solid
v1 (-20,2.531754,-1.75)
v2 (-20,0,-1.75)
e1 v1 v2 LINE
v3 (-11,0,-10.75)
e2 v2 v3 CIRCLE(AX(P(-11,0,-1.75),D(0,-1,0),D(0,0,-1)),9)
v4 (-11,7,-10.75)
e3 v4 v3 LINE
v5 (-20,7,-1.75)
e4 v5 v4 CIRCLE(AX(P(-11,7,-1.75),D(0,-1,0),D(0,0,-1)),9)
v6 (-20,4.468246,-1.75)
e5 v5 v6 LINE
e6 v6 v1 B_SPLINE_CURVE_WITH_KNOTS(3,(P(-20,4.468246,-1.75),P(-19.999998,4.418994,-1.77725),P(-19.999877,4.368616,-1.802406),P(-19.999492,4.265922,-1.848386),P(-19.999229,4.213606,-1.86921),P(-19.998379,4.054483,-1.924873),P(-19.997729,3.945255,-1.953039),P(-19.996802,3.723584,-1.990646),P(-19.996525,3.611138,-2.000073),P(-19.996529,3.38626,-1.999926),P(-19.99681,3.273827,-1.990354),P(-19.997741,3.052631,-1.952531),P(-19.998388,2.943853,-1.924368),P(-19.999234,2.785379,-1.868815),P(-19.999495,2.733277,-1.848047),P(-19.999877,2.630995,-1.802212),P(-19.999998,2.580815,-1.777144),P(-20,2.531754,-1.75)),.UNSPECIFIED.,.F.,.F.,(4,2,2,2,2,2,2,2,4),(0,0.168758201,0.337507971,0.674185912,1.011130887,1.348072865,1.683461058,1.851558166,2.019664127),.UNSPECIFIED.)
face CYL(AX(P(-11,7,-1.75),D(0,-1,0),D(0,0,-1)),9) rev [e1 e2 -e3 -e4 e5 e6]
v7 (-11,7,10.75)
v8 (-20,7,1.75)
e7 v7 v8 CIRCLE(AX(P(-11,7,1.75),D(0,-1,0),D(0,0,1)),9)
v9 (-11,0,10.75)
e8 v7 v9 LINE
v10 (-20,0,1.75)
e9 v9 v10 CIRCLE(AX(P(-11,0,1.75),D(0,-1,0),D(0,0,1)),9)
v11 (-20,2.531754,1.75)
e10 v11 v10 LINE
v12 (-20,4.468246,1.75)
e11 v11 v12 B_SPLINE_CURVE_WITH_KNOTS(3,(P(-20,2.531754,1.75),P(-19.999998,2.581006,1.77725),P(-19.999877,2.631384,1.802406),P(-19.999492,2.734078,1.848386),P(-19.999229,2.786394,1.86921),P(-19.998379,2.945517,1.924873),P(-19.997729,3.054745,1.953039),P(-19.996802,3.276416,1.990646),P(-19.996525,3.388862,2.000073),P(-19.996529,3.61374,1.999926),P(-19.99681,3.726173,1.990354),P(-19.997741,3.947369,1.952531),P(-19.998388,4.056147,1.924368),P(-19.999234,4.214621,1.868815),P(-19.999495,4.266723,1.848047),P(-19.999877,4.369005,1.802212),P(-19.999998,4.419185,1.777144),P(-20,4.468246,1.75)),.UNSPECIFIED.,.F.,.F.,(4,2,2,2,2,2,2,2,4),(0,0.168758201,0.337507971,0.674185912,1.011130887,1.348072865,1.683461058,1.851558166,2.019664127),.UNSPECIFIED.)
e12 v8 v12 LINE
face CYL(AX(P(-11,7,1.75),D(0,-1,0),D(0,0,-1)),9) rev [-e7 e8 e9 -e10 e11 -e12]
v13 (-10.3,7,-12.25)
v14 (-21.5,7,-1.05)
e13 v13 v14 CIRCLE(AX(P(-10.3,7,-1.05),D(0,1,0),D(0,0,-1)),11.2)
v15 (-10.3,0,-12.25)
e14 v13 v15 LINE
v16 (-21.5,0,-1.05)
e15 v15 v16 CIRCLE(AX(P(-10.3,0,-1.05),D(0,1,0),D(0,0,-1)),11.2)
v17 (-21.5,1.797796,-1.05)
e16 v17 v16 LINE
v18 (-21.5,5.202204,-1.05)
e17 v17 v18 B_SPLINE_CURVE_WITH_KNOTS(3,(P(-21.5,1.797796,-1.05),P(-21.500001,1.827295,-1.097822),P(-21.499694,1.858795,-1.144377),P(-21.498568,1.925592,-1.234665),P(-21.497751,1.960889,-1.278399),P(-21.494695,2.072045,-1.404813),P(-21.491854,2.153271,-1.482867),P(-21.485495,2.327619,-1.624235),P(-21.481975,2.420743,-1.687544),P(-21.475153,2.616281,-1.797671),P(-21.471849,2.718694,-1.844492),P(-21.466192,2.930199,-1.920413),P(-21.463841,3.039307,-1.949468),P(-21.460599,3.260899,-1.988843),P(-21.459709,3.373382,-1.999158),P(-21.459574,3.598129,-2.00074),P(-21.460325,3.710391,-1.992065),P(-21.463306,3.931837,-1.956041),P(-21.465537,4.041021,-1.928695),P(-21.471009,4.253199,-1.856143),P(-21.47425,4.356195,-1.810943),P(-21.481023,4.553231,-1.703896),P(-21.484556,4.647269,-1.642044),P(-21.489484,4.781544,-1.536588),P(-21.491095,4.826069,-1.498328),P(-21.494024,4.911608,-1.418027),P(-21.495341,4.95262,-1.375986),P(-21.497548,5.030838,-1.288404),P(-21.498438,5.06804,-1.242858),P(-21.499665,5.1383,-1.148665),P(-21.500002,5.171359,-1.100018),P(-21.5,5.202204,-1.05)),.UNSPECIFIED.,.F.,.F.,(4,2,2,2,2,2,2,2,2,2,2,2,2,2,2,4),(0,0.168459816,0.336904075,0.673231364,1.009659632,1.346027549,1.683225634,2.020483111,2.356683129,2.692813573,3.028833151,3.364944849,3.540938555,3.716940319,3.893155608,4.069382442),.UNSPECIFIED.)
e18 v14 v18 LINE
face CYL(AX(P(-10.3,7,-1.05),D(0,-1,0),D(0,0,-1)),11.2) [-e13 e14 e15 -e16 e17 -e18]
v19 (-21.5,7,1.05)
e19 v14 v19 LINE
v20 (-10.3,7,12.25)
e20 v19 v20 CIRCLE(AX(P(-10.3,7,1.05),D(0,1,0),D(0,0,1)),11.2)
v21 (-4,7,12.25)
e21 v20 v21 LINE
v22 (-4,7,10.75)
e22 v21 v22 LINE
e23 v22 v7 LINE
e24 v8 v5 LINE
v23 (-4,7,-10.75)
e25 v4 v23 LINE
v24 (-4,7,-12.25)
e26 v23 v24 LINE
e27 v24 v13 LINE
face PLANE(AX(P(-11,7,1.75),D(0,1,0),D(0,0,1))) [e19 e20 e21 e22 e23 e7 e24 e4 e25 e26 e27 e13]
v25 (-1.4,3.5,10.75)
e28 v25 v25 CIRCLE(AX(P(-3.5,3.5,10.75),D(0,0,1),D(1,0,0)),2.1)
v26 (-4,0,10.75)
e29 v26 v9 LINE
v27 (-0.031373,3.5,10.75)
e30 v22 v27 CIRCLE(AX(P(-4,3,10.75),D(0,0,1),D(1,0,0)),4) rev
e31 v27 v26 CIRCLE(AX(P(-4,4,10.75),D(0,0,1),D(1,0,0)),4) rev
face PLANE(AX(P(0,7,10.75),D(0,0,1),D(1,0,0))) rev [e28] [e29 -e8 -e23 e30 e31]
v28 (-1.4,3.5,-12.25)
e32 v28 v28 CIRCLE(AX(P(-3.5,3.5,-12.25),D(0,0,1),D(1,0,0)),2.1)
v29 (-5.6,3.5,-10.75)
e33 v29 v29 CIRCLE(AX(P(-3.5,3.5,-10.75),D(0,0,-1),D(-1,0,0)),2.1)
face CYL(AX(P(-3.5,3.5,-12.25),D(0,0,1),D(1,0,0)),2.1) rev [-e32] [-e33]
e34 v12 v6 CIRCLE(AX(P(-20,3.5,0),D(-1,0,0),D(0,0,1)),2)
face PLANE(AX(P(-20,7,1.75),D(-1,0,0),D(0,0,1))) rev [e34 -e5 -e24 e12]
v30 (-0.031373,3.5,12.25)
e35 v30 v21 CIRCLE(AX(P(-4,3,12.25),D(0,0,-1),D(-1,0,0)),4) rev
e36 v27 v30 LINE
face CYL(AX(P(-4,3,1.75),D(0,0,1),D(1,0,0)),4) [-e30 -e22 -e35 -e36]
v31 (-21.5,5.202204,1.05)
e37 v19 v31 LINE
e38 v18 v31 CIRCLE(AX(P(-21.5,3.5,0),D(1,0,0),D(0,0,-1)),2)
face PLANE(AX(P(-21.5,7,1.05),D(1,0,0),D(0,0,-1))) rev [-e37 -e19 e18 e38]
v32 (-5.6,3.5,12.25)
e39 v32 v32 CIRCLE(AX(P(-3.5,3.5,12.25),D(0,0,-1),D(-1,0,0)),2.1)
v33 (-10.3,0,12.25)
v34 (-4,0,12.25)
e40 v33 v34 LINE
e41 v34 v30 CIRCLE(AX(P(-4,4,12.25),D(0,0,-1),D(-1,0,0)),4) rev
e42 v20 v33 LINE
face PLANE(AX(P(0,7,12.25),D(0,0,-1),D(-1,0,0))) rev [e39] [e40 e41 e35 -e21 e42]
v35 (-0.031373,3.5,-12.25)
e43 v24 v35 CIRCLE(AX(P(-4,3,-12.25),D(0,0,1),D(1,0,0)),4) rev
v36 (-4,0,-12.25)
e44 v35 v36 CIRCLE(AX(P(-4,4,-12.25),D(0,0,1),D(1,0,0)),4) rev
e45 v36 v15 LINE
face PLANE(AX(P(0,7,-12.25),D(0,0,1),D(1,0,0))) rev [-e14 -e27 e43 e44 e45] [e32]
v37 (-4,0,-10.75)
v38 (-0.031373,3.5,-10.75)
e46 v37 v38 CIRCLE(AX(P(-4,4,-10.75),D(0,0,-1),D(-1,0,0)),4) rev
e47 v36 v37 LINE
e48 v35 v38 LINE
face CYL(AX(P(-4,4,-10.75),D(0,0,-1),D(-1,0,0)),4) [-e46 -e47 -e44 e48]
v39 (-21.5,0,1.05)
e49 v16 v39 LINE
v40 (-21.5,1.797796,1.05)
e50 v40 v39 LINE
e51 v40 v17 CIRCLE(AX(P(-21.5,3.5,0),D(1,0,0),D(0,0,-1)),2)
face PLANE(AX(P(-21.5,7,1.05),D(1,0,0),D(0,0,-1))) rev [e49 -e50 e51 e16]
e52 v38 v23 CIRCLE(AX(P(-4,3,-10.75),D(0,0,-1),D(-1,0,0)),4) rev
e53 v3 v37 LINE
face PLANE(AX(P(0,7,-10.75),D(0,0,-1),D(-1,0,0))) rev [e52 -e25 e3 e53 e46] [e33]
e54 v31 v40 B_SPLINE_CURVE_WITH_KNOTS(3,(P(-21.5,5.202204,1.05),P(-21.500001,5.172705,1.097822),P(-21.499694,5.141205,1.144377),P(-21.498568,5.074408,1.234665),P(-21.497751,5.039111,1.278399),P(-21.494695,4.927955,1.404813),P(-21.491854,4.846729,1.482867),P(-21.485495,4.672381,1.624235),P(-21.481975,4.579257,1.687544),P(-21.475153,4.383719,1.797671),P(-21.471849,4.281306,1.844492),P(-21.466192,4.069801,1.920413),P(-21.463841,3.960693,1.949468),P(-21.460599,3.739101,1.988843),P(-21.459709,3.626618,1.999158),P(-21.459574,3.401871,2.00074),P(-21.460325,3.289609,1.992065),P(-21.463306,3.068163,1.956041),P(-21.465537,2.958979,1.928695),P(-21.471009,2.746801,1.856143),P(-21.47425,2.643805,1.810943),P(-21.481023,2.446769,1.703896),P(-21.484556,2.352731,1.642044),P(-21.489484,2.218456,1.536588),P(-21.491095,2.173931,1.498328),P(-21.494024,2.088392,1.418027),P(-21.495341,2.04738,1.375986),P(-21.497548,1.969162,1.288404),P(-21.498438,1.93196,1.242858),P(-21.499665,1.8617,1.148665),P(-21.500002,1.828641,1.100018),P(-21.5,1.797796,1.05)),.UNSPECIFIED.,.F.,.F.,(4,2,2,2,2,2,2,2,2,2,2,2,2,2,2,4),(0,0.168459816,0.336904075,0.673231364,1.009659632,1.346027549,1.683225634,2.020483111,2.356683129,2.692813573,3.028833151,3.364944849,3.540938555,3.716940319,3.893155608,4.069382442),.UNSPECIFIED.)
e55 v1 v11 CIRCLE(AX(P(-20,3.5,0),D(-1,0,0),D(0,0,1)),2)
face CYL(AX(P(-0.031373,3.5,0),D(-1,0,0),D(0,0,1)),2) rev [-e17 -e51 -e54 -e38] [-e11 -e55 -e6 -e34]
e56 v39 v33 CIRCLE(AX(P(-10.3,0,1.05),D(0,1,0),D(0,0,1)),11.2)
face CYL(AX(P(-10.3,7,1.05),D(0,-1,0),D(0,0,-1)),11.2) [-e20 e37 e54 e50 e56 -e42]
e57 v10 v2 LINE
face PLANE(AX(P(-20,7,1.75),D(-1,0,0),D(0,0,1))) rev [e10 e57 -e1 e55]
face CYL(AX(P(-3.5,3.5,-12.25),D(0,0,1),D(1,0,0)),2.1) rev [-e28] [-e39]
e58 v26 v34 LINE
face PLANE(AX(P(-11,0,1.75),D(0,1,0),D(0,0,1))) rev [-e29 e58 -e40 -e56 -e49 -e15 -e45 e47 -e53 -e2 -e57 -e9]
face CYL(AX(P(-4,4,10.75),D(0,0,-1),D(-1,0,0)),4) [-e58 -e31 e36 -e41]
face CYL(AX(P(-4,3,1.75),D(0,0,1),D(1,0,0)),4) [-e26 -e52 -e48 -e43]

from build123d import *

# Parameters (mm, degrees)
EXTRUDE_1_DEPTH          = 7
CUT_EXTRUDE_1_DEPTH      = 34.339166156
CUT_EXTRUDE_1_DEPTH_BACK = 34.339166156
SKETCH_2_R               = 2.1
FILLET_1_R               = 4
CUT_EXTRUDE_2_DEPTH      = 26.689773137
CUT_EXTRUDE_2_DEPTH_BACK = 26.689773137
SKETCH_3_R               = 2


with BuildPart() as part:
    # Эскиз1 → Бобышка-Вытянуть1 (new body)
    with BuildSketch(Plane(origin=(0, 0, 0), x_dir=(1, 0, 0), z_dir=(0, 1, 0))):
        with BuildLine():
            Line((0, 10.75), (0, 12.25))
            Line((0, 12.25), (-10.3, 12.25))
            ThreePointArc((-10.3, 12.25), (-18.219595949, 8.969595949), (-21.5, 1.05))
            Line((-21.5, 1.05), (-21.5, -1.05))
            ThreePointArc((-21.5, -1.05), (-18.219595949, -8.969595949), (-10.3, -12.25))
            Line((-10.3, -12.25), (0, -12.25))
            Line((0, -12.25), (0, -10.75))
            Line((0, -10.75), (-11, -10.75))
            ThreePointArc((-11, -10.75), (-17.363961031, -8.113961031), (-20, -1.75))
            Line((-20, -1.75), (-20, 1.75))
            ThreePointArc((-20, 1.75), (-17.363961031, 8.113961031), (-11, 10.75))
            Line((-11, 10.75), (0, 10.75))
        make_face()
    extrude(amount=EXTRUDE_1_DEPTH)

    # Эскиз2 → Вырез-Вытянуть1 (cut, two sides: drawn at the far end of the back side and taken through both)
    with BuildSketch(Plane.XY.offset(12.25).offset(-CUT_EXTRUDE_1_DEPTH_BACK)):
        with Locations((-3.5, 3.5)):
            Circle(SKETCH_2_R)
    extrude(amount=CUT_EXTRUDE_1_DEPTH + CUT_EXTRUDE_1_DEPTH_BACK, mode=Mode.SUBTRACT)

    # Скругление1
    # the kernel refuses this fillet: 4 mm, written as the material it takes off along each edge
    with BuildSketch(Plane(origin=(0, 0, -0.75), x_dir=(-1, 0, 0), z_dir=(0, 0, -1)), Plane(origin=(0, 0, 22.25), x_dir=(-1, 0, 0), z_dir=(0, 0, -1))) as fillet_1_piece_1:
        with BuildLine():
            CenterArc((FILLET_1_R, FILLET_1_R), FILLET_1_R, 180, 90)
            Line((0, FILLET_1_R), (0, 0))
            Line((0, 0), (FILLET_1_R, 0))
        make_face()
    extrude(amount=21.5, mode=Mode.SUBTRACT)
    with BuildSketch(Plane(origin=(0, 7, -0.75), x_dir=(-1, 0, 0), z_dir=(0, 0, -1)), Plane(origin=(0, 7, 22.25), x_dir=(-1, 0, 0), z_dir=(0, 0, -1))) as fillet_1_piece_2:
        with BuildLine():
            CenterArc((FILLET_1_R, -FILLET_1_R), FILLET_1_R, 90, 90)
            Line((0, -FILLET_1_R), (0, 0))
            Line((0, 0), (FILLET_1_R, 0))
        make_face()
    extrude(amount=21.5, mode=Mode.SUBTRACT)

    # Эскиз3 → Вырез-Вытянуть2 (cut, two sides: drawn at the far end of the back side and taken through both)
    with BuildSketch(Plane.ZY.offset(21.5).offset(-CUT_EXTRUDE_2_DEPTH_BACK)):
        with Locations(Location((0, 3.5, 0), (0, 0, 28.955024372))):
            Circle(SKETCH_3_R)
    extrude(amount=CUT_EXTRUDE_2_DEPTH + CUT_EXTRUDE_2_DEPTH_BACK, mode=Mode.SUBTRACT)


solid = part.part
